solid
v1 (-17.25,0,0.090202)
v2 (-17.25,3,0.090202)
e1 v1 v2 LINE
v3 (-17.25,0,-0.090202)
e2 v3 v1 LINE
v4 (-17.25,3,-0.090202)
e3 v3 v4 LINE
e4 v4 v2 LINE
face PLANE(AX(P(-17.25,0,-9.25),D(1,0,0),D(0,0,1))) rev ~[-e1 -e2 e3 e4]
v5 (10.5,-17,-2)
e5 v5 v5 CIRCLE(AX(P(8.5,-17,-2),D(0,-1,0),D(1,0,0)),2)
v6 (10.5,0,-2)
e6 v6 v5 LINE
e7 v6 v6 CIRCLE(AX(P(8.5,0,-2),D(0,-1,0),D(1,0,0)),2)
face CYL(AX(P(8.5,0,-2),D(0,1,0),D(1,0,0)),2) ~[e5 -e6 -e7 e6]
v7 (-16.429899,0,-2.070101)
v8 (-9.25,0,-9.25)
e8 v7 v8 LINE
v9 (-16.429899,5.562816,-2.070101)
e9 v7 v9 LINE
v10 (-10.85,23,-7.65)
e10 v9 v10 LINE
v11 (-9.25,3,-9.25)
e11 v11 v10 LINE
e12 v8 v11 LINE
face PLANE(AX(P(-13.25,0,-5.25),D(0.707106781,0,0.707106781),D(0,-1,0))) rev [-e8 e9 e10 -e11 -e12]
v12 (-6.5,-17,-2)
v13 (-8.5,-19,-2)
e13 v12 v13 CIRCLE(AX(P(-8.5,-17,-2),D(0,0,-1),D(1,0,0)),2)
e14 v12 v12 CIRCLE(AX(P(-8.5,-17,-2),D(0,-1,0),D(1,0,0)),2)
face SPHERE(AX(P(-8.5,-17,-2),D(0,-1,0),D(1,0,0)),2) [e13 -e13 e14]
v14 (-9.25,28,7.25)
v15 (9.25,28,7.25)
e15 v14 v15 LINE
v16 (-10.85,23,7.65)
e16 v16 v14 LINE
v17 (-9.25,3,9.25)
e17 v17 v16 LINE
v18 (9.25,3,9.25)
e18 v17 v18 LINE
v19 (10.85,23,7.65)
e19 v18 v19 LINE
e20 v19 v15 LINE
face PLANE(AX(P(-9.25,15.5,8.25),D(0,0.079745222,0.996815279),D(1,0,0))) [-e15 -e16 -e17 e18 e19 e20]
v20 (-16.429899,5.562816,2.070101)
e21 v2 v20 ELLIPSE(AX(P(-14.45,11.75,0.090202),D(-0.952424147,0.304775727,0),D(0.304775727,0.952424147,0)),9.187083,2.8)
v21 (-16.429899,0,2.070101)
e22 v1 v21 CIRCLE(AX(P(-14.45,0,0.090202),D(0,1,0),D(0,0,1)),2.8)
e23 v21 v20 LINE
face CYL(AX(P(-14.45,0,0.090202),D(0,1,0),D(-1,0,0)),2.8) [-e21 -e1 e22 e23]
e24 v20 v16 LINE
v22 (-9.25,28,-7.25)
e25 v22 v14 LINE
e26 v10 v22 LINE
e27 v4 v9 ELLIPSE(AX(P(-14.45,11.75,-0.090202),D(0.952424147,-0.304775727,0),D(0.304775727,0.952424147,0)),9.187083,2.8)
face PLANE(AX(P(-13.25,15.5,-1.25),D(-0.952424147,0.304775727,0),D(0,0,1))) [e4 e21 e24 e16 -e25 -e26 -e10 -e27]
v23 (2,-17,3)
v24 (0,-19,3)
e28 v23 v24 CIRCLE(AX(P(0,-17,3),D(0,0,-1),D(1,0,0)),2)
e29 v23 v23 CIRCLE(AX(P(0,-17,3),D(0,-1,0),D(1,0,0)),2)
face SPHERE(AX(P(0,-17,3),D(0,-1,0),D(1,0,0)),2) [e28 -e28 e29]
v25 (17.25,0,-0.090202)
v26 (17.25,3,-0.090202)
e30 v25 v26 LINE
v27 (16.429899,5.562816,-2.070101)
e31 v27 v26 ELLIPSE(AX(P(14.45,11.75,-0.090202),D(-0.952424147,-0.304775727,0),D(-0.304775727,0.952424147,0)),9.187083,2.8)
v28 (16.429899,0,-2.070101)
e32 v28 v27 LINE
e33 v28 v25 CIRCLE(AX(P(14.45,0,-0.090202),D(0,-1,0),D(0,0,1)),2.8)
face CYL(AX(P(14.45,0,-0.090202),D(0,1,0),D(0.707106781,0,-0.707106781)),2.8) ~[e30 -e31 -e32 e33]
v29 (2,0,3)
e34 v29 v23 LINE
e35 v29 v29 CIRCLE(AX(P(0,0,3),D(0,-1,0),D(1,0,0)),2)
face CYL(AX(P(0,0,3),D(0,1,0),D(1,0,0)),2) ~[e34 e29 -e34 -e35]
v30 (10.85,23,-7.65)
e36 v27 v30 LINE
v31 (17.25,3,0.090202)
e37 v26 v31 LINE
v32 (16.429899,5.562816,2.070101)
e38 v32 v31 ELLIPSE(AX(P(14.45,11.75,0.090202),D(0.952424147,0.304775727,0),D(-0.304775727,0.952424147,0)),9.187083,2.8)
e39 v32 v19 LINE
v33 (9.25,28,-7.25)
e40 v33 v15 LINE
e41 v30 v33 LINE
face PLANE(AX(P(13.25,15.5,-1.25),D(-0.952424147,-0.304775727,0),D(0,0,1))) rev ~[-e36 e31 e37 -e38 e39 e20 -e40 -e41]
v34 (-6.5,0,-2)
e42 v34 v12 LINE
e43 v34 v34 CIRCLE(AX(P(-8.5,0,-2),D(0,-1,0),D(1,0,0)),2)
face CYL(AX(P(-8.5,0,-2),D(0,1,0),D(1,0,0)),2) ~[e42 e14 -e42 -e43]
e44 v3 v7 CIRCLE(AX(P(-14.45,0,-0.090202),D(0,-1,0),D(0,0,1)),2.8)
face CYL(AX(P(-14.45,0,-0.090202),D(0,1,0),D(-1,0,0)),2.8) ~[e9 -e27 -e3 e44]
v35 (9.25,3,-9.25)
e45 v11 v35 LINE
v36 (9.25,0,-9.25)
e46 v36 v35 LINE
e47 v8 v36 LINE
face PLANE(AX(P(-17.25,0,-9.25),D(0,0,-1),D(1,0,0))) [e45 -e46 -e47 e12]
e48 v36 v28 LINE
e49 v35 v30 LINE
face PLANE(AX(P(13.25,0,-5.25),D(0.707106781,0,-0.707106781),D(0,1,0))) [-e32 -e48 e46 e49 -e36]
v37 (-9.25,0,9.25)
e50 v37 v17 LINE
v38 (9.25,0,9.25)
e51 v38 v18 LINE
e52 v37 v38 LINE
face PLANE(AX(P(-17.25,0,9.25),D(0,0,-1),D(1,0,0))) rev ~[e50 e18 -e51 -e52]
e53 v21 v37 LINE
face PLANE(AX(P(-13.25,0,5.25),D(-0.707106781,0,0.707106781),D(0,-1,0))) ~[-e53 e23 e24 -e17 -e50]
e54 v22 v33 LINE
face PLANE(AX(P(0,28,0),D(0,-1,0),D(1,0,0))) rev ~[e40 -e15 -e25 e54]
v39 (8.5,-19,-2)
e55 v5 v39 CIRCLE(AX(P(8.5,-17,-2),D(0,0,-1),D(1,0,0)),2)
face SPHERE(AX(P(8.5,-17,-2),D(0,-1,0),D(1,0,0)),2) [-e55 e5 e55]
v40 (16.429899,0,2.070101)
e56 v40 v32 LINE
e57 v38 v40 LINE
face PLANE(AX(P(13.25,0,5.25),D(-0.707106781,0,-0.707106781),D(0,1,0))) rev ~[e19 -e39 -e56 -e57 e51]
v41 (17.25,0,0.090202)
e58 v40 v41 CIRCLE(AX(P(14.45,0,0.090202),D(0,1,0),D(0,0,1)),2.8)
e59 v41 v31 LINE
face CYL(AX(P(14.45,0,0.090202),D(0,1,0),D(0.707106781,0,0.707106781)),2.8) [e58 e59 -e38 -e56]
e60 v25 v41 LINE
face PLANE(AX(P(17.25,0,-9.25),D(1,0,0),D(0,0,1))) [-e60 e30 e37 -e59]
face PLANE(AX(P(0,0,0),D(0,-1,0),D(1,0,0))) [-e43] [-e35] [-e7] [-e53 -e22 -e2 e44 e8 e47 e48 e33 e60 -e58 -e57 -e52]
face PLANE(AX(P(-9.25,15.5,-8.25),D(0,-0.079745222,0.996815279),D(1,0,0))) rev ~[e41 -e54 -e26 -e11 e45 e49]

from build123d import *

# Parameters (mm, degrees)
F0_W       = 34.5
F0_H       = 18.5
F1_DEPTH   = 28
F2_R       = 2
F3_DEPTH   = 19
F4_SIZE    = 8
F5_SIZE2   = 8
F5_SIZE    = 25
F5_2_SIZE2 = 8
F5_2_SIZE  = 25
F6_SIZE2   = 2
F6_SIZE    = 25
F6_2_SIZE2 = 2
F6_2_SIZE  = 25
F7_R       = 2
F8_R       = 2.8


with BuildPart() as f1:
    # F0 (on Front) → F1 (new body)
    with BuildSketch(Plane.XZ):
        Rectangle(F0_W, F0_H)
    extrude(amount=-F1_DEPTH)

    # F2 (on face) → F3 (join)
    with BuildSketch(Plane.XZ):
        with Locations((-8.5, -2)):
            Circle(F2_R)
        with Locations((8.5, -2)):
            Circle(F2_R)
        with Locations((0, 3)):
            Circle(F2_R)
    extrude(amount=F3_DEPTH)

    # F4
    f4_edges = [f1.edges().sort_by_distance(p)[0] for p in [
        (17.25, 14, 9.25),
        (-17.25, 14, 9.25),
        (17.25, 14, -9.25),
        (-17.25, 14, -9.25),
    ]]
    chamfer(f4_edges, length=F4_SIZE)

    # F5
    f5_edges = [f1.edges().sort_by_distance(p)[0] for p in [
        (17.25, 28, 0),
    ]]
    f5_side = f1.faces().sort_by_distance((17.25, 14, 0))[0]
    chamfer(f5_edges, length=F5_SIZE, length2=F5_SIZE2, reference=f5_side)

    # F5#2
    f5_2_edges = [f1.edges().sort_by_distance(p)[0] for p in [
        (-17.25, 28, 0),
    ]]
    f5_2_side = f1.faces().sort_by_distance((-17.25, 14, 0))[0]
    chamfer(f5_2_edges, length=F5_2_SIZE, length2=F5_2_SIZE2, reference=f5_2_side)

    # F6
    f6_edges = [f1.edges().sort_by_distance(p)[0] for p in [
        (0, 28, 9.25),
    ]]
    f6_side = f1.faces().sort_by_distance((0, 14, 9.25))[0]
    chamfer(f6_edges, length=F6_SIZE, length2=F6_SIZE2, reference=f6_side)

    # F6#2
    f6_2_edges = [f1.edges().sort_by_distance(p)[0] for p in [
        (0, 28, -9.25),
    ]]
    f6_2_side = f1.faces().sort_by_distance((0, 14, -9.25))[0]
    chamfer(f6_2_edges, length=F6_2_SIZE, length2=F6_2_SIZE2, reference=f6_2_side)

    # F7
    f7_edges = [f1.edges().sort_by_distance(p)[0] for p in [
        (-10.5, -19, -2),
        (6.5, -19, -2),
        (-2, -19, 3),
    ]]
    fillet(f7_edges, radius=F7_R)

    # F8
    f8_edges = [f1.edges().sort_by_distance(p)[0] for p in [
        (-17.25, 1.5, 1.25),
        (-17.25, 1.5, -1.25),
        (17.25, 1.5, 1.25),
        (17.25, 1.5, -1.25),
    ]]
    fillet(f8_edges, radius=F8_R)


solid = f1.part
